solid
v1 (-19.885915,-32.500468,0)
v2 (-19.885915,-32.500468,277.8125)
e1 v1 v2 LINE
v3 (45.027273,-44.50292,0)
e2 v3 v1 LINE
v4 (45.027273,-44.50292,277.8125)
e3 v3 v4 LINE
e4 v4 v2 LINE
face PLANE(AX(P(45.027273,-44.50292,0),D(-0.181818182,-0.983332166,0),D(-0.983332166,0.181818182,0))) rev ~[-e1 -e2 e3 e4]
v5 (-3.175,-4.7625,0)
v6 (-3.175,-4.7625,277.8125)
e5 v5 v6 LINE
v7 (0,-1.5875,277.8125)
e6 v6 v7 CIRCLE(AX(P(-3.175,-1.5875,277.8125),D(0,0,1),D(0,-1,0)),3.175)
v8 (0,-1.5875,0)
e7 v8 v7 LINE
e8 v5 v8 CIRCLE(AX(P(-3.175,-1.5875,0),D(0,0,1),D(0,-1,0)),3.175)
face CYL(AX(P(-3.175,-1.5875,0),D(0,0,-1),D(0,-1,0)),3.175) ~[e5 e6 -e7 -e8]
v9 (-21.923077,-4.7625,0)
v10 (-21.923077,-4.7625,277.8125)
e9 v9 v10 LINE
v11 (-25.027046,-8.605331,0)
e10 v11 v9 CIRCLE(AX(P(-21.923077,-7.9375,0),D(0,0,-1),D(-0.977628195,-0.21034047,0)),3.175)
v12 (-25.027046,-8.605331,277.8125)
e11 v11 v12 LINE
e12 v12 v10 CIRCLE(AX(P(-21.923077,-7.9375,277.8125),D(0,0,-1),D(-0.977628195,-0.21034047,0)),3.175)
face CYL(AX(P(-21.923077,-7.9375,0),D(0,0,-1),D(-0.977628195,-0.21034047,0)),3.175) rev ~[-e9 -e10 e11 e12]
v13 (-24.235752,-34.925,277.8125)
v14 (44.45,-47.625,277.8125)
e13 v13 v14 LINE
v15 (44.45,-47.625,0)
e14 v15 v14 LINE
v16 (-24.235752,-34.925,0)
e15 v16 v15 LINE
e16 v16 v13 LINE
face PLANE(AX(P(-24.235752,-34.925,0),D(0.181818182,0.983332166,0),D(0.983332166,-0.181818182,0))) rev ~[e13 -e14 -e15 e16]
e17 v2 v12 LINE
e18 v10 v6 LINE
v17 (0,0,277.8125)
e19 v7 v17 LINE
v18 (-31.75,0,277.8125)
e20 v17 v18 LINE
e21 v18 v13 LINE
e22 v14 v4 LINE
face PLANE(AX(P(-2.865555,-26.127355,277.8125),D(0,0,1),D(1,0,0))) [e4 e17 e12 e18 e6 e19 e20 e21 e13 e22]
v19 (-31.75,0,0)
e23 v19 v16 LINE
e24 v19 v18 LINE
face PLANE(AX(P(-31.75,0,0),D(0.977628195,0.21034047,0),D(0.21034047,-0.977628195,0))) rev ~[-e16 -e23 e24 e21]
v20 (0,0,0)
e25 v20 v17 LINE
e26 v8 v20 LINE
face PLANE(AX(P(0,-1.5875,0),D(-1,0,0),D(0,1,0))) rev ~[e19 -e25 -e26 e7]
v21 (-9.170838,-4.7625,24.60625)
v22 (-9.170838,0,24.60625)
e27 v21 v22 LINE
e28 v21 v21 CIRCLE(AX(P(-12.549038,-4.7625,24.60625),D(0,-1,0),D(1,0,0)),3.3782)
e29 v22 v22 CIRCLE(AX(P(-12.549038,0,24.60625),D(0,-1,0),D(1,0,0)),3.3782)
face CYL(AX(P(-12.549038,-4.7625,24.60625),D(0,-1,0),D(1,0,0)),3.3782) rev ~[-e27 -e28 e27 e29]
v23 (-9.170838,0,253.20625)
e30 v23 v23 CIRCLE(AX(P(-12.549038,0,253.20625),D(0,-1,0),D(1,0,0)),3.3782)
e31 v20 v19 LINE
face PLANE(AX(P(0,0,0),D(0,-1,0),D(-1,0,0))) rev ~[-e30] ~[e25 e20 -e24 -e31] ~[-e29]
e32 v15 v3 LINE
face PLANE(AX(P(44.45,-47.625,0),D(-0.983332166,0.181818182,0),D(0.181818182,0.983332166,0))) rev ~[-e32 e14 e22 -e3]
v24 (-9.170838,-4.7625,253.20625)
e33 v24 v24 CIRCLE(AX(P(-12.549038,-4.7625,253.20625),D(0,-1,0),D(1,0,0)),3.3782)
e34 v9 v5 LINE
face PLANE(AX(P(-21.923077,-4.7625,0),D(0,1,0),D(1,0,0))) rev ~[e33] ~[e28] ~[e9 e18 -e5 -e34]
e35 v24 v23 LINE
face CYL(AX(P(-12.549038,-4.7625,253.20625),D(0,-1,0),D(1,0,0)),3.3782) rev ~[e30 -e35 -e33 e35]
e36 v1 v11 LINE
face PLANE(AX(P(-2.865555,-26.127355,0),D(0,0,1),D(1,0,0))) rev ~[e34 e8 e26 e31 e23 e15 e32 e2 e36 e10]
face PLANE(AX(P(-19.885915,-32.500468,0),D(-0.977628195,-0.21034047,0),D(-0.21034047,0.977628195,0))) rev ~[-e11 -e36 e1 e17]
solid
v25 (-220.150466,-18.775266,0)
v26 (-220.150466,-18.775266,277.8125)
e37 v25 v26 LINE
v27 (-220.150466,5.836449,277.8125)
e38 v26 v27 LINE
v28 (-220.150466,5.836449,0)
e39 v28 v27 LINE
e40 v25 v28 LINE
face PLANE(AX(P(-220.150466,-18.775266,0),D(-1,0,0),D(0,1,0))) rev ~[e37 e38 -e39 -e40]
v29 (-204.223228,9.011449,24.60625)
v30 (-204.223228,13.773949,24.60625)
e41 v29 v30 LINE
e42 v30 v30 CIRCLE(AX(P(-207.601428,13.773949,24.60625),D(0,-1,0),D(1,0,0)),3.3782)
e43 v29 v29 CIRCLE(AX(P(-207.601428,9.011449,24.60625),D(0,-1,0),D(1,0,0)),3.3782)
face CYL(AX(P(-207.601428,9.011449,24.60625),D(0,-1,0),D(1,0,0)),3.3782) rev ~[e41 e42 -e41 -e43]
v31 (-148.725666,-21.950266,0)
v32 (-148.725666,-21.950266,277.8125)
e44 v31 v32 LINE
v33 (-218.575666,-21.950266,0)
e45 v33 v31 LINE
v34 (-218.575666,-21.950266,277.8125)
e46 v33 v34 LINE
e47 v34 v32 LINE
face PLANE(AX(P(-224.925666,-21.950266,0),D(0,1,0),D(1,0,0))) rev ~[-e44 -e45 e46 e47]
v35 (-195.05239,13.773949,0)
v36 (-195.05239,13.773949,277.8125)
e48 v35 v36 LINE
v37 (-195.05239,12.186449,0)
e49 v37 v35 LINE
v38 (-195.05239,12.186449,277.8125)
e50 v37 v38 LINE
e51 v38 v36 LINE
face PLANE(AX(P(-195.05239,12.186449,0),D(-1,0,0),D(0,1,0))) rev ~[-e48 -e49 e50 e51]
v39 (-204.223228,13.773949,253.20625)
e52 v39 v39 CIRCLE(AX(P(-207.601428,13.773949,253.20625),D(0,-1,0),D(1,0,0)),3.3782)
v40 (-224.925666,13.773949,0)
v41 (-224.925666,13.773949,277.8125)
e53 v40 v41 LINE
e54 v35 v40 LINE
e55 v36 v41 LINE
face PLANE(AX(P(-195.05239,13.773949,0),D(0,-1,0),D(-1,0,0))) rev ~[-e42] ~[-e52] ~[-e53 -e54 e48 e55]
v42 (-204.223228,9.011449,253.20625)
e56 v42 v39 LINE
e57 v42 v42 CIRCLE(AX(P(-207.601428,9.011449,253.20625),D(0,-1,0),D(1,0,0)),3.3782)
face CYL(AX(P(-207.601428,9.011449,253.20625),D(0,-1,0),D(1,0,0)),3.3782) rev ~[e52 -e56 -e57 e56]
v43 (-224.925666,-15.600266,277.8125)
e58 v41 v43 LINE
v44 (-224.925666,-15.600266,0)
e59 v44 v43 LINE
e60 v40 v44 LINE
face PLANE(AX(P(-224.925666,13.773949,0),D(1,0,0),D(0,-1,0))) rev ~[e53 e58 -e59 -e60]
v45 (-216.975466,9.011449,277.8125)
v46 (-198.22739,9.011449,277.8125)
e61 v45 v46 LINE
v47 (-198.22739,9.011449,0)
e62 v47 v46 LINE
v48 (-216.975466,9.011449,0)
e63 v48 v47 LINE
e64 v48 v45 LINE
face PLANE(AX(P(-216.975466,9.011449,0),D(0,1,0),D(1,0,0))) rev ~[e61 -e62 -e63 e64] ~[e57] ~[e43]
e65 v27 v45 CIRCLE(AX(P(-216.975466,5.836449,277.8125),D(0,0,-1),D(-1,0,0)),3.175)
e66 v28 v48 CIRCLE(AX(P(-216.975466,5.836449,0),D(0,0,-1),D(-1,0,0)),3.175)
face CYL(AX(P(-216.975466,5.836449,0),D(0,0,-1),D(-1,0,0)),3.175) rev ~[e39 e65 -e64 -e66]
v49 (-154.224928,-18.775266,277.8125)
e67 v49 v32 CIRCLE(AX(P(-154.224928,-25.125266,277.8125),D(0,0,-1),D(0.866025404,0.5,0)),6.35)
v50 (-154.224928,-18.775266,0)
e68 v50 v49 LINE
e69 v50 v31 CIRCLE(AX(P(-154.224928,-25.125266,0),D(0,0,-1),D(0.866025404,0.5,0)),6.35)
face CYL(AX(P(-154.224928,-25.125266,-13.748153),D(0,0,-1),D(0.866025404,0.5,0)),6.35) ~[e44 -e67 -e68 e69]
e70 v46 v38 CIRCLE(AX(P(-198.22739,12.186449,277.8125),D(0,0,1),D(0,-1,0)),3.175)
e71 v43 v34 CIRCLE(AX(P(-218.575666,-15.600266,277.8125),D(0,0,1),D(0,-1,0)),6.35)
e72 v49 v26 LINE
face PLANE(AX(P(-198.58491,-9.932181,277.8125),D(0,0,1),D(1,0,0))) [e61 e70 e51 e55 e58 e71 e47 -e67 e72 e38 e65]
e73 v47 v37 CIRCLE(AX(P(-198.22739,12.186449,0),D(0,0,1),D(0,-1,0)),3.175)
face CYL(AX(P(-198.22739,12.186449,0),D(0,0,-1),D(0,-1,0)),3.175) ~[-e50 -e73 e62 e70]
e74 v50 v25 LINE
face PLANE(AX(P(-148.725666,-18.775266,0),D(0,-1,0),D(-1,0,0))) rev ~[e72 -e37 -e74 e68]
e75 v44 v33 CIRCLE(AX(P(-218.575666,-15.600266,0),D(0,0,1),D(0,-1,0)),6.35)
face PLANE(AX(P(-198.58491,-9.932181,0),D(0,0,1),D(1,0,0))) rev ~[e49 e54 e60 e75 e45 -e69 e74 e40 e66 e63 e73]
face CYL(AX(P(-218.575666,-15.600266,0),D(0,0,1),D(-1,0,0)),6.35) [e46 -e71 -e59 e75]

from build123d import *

# Parameters (mm, degrees)
F1_DEPTH    = 277.8125
F3_D        = 6.7564
F3_DEPTH    = 4.7635
F5_DEPTH    = 277.8125
F7_D        = 6.7564
F7_DEPTH    = 4.7635
F8_R        = 6.35
F9_T1_DEPTH = 305.3088065702


# Not quite as in the source:
# - a fillet or chamfer that OpenCascade refuses, or shapes differently, is made with other operations: its cross-section is extruded or revolved along the edge and cut away or added


with BuildPart() as f1:
    # F0 (on Top) → F1 (new body)
    with BuildSketch(Plane.XY):
        with BuildLine():
            Line((0, -1.5875), (0, 0))
            Line((0, 0), (-31.75, 0))
            Line((-31.75, 0), (-24.2357517976, -34.925))
            Line((-24.2357517976, -34.925), (44.45, -47.625))
            Line((44.45, -47.625), (45.0272727273, -44.5029203728))
            Line((45.0272727273, -44.5029203728), (-19.8859153776, -32.5004676464))
            Line((-19.8859153776, -32.5004676464), (-25.0270460191, -8.6053309912))
            ThreePointArc((-25.0270460191, -8.6053309912), (-24.392994354, -5.9424734835), (-21.9230765014, -4.7625))
            Line((-21.9230765014, -4.7625), (-3.175, -4.7625))
            ThreePointArc((-3.175, -4.7625), (-0.9299359697, -3.8325640303), (0, -1.5875))
        make_face()
    extrude(amount=F1_DEPTH)

    # F3 (through all, one way)
    with BuildSketch(Plane.XZ.offset(4.7625)):
        with Locations((-12.5490382507, 253.20625), (-12.5490382507, 24.60625)):
            Circle(F3_D / 2)
    extrude(amount=-F3_DEPTH, mode=Mode.SUBTRACT)


with BuildPart() as f5:
    # F4 (on Top) → F5 (new body)
    with BuildSketch(Plane.XY):
        with BuildLine():
            Line((-195.0523899696, 12.1864487154), (-195.0523899696, 13.7739487154))
            Line((-195.0523899696, 13.7739487154), (-224.925666471, 13.7739487154))
            Line((-224.925666471, 13.7739487154), (-224.925666471, -21.9502664761))
            Line((-224.925666471, -21.9502664761), (-148.725666471, -21.9502664761))
            Line((-148.725666471, -21.9502664761), (-148.725666471, -18.7752664761))
            Line((-148.725666471, -18.7752664761), (-220.150466471, -18.7752664761))
            Line((-220.150466471, -18.7752664761), (-220.150466471, 5.8364487154))
            ThreePointArc((-220.150466471, 5.8364487154), (-219.2205305013, 8.0815127456), (-216.975466471, 9.0114487154))
            Line((-216.975466471, 9.0114487154), (-198.2273899696, 9.0114487154))
            ThreePointArc((-198.2273899696, 9.0114487154), (-195.9823259393, 9.9413846851), (-195.0523899696, 12.1864487154))
        make_face()
    extrude(amount=F5_DEPTH)

    # F7 (through all, one way)
    with BuildSketch(Plane.XZ.offset(-9.0114487154)):
        with Locations((-207.6014282203, 253.20625), (-207.6014282203, 24.60625)):
            Circle(F7_D / 2)
    extrude(amount=-F7_DEPTH, mode=Mode.SUBTRACT)

    # F8
    f8_edges = [f5.edges().sort_by_distance(p)[0] for p in [
        (-224.925666, -21.950266, 138.90625),
    ]]
    fillet(f8_edges, radius=F8_R)

    # F9: fillet of radius 6.35 on 1 edges, made by hand

    # F9_s2 → F9_t1 (cut)
    with BuildSketch(Plane.XY.offset(-13.7481532851)):
        with BuildLine():
            ThreePointArc((-148.725666471, -21.9502664761), (-151.049927785, -19.6260051621), (-154.224927785, -18.7752664761))
            Line((-154.224927785, -18.7752664761), (-148.725666471, -18.7752664761))
            Line((-148.725666471, -18.7752664761), (-148.725666471, -21.9502664761))
        make_face()
    extrude(amount=F9_T1_DEPTH, mode=Mode.SUBTRACT)


solid = Compound([f1.part, f5.part])
